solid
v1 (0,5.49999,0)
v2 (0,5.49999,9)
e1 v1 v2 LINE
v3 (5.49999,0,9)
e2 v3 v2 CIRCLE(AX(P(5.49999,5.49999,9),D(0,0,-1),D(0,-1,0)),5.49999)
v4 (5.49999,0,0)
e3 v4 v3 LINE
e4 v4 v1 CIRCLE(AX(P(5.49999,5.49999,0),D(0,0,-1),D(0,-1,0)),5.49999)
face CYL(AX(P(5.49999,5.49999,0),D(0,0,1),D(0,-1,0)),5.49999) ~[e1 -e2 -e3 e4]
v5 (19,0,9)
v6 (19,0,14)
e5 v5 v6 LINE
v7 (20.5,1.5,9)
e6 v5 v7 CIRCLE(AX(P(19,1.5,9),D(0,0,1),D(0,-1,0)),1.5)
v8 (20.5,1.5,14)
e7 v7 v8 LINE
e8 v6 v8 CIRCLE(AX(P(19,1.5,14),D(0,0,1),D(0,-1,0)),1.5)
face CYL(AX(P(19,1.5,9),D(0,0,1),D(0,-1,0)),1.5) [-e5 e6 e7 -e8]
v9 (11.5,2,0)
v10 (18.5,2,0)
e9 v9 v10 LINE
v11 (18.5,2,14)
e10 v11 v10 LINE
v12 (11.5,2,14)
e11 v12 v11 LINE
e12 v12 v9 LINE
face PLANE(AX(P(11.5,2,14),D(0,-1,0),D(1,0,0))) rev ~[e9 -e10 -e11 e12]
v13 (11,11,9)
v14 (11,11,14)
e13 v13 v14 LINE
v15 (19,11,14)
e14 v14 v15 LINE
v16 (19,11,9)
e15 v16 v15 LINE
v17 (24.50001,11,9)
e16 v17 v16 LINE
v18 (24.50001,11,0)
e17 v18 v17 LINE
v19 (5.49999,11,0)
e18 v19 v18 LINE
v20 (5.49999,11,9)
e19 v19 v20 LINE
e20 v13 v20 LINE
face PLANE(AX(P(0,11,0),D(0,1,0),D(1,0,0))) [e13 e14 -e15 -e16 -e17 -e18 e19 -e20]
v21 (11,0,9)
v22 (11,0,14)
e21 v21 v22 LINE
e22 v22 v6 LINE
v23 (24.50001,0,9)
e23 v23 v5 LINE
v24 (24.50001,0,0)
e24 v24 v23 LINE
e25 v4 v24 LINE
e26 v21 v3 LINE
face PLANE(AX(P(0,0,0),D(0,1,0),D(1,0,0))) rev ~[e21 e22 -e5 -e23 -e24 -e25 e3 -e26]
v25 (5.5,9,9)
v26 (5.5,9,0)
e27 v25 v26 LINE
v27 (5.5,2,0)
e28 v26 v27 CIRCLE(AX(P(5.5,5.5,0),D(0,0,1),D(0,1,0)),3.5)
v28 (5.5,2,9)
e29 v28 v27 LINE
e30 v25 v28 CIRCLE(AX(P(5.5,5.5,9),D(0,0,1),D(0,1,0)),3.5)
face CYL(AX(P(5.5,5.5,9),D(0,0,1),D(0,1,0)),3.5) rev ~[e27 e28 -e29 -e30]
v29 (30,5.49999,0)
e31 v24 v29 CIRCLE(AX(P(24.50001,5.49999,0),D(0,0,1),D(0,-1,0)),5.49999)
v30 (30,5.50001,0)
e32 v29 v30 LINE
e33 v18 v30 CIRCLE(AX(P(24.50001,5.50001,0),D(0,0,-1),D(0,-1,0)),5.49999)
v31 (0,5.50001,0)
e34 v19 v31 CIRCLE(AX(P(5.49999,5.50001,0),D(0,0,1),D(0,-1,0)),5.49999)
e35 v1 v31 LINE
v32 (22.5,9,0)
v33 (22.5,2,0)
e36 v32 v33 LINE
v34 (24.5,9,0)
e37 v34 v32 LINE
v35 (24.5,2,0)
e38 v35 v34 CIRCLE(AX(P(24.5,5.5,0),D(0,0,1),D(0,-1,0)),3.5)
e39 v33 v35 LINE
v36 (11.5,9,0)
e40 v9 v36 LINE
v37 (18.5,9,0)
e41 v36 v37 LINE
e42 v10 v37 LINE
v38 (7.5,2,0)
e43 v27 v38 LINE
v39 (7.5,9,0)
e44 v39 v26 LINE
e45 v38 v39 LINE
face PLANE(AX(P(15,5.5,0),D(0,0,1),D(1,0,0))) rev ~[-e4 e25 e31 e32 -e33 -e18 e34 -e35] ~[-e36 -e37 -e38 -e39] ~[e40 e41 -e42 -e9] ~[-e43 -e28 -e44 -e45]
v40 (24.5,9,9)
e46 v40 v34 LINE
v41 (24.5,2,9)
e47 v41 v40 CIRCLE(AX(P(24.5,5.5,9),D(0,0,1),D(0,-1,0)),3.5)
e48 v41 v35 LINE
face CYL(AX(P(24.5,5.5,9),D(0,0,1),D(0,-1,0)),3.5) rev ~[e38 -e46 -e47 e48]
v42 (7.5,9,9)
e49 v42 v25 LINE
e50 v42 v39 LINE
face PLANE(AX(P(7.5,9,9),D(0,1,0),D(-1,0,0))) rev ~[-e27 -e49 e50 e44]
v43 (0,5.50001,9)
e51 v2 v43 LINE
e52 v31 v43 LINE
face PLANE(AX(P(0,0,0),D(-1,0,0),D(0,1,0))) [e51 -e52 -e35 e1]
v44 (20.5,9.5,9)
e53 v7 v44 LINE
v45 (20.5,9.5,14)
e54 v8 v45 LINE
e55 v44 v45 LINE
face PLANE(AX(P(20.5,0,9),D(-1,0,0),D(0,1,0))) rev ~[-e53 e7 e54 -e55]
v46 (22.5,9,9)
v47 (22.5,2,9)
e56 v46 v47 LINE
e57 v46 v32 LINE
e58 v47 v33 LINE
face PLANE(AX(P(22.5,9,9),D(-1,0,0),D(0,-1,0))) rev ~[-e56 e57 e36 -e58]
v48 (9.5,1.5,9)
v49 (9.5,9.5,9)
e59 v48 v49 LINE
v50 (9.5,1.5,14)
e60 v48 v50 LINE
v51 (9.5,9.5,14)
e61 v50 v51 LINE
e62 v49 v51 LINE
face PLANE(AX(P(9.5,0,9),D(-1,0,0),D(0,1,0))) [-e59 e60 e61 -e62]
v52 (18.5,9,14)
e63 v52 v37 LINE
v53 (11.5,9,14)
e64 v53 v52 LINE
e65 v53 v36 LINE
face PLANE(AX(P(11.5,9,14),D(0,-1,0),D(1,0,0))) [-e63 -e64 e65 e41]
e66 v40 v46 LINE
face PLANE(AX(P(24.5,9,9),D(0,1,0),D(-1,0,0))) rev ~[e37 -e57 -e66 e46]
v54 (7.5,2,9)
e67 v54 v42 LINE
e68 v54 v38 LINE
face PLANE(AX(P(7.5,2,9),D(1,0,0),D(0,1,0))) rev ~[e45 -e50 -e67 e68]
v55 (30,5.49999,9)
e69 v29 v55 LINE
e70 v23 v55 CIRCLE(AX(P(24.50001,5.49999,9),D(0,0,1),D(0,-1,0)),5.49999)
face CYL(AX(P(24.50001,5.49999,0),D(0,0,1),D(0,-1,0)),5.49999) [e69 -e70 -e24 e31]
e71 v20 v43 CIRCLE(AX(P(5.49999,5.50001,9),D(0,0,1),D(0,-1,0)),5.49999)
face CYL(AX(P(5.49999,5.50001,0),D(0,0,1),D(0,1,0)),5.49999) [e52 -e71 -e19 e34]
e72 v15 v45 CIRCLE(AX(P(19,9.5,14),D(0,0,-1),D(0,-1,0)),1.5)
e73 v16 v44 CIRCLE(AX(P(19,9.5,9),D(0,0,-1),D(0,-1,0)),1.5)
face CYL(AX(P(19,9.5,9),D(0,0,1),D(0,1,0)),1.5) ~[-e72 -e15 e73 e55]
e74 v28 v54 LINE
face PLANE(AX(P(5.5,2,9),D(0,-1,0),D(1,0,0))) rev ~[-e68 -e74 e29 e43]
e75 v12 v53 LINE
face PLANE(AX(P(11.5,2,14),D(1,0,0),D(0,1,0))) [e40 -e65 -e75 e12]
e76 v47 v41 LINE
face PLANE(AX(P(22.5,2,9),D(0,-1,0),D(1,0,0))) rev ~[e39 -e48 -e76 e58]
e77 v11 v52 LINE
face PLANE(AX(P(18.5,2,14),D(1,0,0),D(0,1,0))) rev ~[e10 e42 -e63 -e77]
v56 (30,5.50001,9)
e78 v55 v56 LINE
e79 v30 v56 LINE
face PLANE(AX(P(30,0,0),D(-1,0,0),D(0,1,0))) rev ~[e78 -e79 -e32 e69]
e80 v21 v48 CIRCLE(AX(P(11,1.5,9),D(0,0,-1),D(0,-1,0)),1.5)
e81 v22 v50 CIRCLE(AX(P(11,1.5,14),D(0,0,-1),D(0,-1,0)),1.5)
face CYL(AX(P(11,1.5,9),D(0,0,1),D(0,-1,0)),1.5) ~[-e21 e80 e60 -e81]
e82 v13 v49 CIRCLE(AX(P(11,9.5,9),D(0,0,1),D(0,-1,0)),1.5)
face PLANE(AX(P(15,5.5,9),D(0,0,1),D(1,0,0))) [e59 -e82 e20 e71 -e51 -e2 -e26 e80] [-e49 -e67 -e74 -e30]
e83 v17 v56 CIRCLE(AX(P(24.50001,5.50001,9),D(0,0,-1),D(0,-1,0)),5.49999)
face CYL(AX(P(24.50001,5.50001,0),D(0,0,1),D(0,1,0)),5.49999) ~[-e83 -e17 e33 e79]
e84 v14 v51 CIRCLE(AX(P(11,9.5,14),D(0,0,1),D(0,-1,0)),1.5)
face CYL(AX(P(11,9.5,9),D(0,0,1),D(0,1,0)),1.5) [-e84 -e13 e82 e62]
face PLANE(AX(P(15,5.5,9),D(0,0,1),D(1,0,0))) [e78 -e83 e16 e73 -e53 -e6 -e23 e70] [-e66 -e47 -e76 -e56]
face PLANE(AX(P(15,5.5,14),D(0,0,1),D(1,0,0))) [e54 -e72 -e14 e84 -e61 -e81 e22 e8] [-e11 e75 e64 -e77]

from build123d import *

# Parameters (mm, degrees)
F0_W     = 30
F0_H     = 11
F1_DEPTH = 9
F2_W     = 11
F2_H     = 11
F3_DEPTH = 5
F4_R     = 1.5
F5_R     = 5.49999
F6_W     = 7
F6_H     = 7
F7_DEPTH = 25
F9_DEPTH = 25


# Not quite as in the source:
# - a fillet or chamfer is up to 0.001 mm smaller than in the source, because OpenCascade refuses the exact size


with BuildPart() as f1:
    # F0 (on Top) → F1 (new body)
    with BuildSketch(Plane.XY):
        with Locations((15, 5.5)):
            Rectangle(F0_W, F0_H)
    extrude(amount=F1_DEPTH)

    # F2 (on face) → F3 (join)
    with BuildSketch(Plane.XY.offset(9)):
        with Locations((15, 5.5)):
            Rectangle(F2_W, F2_H)
    extrude(amount=F3_DEPTH)

    # F4
    f4_edges = [f1.edges().sort_by_distance(p)[0] for p in [
        (20.5, 11, 11.5),
        (9.5, 11, 11.5),
        (9.5, 0, 11.5),
        (20.5, 0, 11.5),
    ]]
    fillet(f4_edges, radius=F4_R)

    # F5 (radius 5.5 in the source; OpenCascade refuses exactly that, so slightly less here)
    f5_edges = [f1.edges().sort_by_distance(p)[0] for p in [
        (30, 11, 4.5),
        (30, 0, 4.5),
        (0, 11, 4.5),
        (0, 0, 4.5),
    ]]
    fillet(f5_edges, radius=F5_R)

    # F6 (on face) → F7 (cut)
    with BuildSketch(Plane.XY.offset(14)):
        with Locations((15, 5.5)):
            Rectangle(F6_W, F6_H)
    extrude(amount=-F7_DEPTH, mode=Mode.SUBTRACT)

    # F8 (on face) → F9 (cut)
    with BuildSketch(Plane.XY.offset(9)):
        with BuildLine():
            Line((24.5, 9), (22.5, 9))
            Line((22.5, 9), (22.5, 2))
            Line((22.5, 2), (24.5, 2))
            ThreePointArc((24.5, 2), (28, 5.5), (24.5, 9))
        make_face()
        with BuildLine():
            Line((7.5, 2), (7.5, 9))
            Line((7.5, 9), (5.5, 9))
            ThreePointArc((5.5, 9), (2, 5.5), (5.5, 2))
            Line((5.5, 2), (7.5, 2))
        make_face()
    extrude(amount=-F9_DEPTH, mode=Mode.SUBTRACT)


solid = f1.part
